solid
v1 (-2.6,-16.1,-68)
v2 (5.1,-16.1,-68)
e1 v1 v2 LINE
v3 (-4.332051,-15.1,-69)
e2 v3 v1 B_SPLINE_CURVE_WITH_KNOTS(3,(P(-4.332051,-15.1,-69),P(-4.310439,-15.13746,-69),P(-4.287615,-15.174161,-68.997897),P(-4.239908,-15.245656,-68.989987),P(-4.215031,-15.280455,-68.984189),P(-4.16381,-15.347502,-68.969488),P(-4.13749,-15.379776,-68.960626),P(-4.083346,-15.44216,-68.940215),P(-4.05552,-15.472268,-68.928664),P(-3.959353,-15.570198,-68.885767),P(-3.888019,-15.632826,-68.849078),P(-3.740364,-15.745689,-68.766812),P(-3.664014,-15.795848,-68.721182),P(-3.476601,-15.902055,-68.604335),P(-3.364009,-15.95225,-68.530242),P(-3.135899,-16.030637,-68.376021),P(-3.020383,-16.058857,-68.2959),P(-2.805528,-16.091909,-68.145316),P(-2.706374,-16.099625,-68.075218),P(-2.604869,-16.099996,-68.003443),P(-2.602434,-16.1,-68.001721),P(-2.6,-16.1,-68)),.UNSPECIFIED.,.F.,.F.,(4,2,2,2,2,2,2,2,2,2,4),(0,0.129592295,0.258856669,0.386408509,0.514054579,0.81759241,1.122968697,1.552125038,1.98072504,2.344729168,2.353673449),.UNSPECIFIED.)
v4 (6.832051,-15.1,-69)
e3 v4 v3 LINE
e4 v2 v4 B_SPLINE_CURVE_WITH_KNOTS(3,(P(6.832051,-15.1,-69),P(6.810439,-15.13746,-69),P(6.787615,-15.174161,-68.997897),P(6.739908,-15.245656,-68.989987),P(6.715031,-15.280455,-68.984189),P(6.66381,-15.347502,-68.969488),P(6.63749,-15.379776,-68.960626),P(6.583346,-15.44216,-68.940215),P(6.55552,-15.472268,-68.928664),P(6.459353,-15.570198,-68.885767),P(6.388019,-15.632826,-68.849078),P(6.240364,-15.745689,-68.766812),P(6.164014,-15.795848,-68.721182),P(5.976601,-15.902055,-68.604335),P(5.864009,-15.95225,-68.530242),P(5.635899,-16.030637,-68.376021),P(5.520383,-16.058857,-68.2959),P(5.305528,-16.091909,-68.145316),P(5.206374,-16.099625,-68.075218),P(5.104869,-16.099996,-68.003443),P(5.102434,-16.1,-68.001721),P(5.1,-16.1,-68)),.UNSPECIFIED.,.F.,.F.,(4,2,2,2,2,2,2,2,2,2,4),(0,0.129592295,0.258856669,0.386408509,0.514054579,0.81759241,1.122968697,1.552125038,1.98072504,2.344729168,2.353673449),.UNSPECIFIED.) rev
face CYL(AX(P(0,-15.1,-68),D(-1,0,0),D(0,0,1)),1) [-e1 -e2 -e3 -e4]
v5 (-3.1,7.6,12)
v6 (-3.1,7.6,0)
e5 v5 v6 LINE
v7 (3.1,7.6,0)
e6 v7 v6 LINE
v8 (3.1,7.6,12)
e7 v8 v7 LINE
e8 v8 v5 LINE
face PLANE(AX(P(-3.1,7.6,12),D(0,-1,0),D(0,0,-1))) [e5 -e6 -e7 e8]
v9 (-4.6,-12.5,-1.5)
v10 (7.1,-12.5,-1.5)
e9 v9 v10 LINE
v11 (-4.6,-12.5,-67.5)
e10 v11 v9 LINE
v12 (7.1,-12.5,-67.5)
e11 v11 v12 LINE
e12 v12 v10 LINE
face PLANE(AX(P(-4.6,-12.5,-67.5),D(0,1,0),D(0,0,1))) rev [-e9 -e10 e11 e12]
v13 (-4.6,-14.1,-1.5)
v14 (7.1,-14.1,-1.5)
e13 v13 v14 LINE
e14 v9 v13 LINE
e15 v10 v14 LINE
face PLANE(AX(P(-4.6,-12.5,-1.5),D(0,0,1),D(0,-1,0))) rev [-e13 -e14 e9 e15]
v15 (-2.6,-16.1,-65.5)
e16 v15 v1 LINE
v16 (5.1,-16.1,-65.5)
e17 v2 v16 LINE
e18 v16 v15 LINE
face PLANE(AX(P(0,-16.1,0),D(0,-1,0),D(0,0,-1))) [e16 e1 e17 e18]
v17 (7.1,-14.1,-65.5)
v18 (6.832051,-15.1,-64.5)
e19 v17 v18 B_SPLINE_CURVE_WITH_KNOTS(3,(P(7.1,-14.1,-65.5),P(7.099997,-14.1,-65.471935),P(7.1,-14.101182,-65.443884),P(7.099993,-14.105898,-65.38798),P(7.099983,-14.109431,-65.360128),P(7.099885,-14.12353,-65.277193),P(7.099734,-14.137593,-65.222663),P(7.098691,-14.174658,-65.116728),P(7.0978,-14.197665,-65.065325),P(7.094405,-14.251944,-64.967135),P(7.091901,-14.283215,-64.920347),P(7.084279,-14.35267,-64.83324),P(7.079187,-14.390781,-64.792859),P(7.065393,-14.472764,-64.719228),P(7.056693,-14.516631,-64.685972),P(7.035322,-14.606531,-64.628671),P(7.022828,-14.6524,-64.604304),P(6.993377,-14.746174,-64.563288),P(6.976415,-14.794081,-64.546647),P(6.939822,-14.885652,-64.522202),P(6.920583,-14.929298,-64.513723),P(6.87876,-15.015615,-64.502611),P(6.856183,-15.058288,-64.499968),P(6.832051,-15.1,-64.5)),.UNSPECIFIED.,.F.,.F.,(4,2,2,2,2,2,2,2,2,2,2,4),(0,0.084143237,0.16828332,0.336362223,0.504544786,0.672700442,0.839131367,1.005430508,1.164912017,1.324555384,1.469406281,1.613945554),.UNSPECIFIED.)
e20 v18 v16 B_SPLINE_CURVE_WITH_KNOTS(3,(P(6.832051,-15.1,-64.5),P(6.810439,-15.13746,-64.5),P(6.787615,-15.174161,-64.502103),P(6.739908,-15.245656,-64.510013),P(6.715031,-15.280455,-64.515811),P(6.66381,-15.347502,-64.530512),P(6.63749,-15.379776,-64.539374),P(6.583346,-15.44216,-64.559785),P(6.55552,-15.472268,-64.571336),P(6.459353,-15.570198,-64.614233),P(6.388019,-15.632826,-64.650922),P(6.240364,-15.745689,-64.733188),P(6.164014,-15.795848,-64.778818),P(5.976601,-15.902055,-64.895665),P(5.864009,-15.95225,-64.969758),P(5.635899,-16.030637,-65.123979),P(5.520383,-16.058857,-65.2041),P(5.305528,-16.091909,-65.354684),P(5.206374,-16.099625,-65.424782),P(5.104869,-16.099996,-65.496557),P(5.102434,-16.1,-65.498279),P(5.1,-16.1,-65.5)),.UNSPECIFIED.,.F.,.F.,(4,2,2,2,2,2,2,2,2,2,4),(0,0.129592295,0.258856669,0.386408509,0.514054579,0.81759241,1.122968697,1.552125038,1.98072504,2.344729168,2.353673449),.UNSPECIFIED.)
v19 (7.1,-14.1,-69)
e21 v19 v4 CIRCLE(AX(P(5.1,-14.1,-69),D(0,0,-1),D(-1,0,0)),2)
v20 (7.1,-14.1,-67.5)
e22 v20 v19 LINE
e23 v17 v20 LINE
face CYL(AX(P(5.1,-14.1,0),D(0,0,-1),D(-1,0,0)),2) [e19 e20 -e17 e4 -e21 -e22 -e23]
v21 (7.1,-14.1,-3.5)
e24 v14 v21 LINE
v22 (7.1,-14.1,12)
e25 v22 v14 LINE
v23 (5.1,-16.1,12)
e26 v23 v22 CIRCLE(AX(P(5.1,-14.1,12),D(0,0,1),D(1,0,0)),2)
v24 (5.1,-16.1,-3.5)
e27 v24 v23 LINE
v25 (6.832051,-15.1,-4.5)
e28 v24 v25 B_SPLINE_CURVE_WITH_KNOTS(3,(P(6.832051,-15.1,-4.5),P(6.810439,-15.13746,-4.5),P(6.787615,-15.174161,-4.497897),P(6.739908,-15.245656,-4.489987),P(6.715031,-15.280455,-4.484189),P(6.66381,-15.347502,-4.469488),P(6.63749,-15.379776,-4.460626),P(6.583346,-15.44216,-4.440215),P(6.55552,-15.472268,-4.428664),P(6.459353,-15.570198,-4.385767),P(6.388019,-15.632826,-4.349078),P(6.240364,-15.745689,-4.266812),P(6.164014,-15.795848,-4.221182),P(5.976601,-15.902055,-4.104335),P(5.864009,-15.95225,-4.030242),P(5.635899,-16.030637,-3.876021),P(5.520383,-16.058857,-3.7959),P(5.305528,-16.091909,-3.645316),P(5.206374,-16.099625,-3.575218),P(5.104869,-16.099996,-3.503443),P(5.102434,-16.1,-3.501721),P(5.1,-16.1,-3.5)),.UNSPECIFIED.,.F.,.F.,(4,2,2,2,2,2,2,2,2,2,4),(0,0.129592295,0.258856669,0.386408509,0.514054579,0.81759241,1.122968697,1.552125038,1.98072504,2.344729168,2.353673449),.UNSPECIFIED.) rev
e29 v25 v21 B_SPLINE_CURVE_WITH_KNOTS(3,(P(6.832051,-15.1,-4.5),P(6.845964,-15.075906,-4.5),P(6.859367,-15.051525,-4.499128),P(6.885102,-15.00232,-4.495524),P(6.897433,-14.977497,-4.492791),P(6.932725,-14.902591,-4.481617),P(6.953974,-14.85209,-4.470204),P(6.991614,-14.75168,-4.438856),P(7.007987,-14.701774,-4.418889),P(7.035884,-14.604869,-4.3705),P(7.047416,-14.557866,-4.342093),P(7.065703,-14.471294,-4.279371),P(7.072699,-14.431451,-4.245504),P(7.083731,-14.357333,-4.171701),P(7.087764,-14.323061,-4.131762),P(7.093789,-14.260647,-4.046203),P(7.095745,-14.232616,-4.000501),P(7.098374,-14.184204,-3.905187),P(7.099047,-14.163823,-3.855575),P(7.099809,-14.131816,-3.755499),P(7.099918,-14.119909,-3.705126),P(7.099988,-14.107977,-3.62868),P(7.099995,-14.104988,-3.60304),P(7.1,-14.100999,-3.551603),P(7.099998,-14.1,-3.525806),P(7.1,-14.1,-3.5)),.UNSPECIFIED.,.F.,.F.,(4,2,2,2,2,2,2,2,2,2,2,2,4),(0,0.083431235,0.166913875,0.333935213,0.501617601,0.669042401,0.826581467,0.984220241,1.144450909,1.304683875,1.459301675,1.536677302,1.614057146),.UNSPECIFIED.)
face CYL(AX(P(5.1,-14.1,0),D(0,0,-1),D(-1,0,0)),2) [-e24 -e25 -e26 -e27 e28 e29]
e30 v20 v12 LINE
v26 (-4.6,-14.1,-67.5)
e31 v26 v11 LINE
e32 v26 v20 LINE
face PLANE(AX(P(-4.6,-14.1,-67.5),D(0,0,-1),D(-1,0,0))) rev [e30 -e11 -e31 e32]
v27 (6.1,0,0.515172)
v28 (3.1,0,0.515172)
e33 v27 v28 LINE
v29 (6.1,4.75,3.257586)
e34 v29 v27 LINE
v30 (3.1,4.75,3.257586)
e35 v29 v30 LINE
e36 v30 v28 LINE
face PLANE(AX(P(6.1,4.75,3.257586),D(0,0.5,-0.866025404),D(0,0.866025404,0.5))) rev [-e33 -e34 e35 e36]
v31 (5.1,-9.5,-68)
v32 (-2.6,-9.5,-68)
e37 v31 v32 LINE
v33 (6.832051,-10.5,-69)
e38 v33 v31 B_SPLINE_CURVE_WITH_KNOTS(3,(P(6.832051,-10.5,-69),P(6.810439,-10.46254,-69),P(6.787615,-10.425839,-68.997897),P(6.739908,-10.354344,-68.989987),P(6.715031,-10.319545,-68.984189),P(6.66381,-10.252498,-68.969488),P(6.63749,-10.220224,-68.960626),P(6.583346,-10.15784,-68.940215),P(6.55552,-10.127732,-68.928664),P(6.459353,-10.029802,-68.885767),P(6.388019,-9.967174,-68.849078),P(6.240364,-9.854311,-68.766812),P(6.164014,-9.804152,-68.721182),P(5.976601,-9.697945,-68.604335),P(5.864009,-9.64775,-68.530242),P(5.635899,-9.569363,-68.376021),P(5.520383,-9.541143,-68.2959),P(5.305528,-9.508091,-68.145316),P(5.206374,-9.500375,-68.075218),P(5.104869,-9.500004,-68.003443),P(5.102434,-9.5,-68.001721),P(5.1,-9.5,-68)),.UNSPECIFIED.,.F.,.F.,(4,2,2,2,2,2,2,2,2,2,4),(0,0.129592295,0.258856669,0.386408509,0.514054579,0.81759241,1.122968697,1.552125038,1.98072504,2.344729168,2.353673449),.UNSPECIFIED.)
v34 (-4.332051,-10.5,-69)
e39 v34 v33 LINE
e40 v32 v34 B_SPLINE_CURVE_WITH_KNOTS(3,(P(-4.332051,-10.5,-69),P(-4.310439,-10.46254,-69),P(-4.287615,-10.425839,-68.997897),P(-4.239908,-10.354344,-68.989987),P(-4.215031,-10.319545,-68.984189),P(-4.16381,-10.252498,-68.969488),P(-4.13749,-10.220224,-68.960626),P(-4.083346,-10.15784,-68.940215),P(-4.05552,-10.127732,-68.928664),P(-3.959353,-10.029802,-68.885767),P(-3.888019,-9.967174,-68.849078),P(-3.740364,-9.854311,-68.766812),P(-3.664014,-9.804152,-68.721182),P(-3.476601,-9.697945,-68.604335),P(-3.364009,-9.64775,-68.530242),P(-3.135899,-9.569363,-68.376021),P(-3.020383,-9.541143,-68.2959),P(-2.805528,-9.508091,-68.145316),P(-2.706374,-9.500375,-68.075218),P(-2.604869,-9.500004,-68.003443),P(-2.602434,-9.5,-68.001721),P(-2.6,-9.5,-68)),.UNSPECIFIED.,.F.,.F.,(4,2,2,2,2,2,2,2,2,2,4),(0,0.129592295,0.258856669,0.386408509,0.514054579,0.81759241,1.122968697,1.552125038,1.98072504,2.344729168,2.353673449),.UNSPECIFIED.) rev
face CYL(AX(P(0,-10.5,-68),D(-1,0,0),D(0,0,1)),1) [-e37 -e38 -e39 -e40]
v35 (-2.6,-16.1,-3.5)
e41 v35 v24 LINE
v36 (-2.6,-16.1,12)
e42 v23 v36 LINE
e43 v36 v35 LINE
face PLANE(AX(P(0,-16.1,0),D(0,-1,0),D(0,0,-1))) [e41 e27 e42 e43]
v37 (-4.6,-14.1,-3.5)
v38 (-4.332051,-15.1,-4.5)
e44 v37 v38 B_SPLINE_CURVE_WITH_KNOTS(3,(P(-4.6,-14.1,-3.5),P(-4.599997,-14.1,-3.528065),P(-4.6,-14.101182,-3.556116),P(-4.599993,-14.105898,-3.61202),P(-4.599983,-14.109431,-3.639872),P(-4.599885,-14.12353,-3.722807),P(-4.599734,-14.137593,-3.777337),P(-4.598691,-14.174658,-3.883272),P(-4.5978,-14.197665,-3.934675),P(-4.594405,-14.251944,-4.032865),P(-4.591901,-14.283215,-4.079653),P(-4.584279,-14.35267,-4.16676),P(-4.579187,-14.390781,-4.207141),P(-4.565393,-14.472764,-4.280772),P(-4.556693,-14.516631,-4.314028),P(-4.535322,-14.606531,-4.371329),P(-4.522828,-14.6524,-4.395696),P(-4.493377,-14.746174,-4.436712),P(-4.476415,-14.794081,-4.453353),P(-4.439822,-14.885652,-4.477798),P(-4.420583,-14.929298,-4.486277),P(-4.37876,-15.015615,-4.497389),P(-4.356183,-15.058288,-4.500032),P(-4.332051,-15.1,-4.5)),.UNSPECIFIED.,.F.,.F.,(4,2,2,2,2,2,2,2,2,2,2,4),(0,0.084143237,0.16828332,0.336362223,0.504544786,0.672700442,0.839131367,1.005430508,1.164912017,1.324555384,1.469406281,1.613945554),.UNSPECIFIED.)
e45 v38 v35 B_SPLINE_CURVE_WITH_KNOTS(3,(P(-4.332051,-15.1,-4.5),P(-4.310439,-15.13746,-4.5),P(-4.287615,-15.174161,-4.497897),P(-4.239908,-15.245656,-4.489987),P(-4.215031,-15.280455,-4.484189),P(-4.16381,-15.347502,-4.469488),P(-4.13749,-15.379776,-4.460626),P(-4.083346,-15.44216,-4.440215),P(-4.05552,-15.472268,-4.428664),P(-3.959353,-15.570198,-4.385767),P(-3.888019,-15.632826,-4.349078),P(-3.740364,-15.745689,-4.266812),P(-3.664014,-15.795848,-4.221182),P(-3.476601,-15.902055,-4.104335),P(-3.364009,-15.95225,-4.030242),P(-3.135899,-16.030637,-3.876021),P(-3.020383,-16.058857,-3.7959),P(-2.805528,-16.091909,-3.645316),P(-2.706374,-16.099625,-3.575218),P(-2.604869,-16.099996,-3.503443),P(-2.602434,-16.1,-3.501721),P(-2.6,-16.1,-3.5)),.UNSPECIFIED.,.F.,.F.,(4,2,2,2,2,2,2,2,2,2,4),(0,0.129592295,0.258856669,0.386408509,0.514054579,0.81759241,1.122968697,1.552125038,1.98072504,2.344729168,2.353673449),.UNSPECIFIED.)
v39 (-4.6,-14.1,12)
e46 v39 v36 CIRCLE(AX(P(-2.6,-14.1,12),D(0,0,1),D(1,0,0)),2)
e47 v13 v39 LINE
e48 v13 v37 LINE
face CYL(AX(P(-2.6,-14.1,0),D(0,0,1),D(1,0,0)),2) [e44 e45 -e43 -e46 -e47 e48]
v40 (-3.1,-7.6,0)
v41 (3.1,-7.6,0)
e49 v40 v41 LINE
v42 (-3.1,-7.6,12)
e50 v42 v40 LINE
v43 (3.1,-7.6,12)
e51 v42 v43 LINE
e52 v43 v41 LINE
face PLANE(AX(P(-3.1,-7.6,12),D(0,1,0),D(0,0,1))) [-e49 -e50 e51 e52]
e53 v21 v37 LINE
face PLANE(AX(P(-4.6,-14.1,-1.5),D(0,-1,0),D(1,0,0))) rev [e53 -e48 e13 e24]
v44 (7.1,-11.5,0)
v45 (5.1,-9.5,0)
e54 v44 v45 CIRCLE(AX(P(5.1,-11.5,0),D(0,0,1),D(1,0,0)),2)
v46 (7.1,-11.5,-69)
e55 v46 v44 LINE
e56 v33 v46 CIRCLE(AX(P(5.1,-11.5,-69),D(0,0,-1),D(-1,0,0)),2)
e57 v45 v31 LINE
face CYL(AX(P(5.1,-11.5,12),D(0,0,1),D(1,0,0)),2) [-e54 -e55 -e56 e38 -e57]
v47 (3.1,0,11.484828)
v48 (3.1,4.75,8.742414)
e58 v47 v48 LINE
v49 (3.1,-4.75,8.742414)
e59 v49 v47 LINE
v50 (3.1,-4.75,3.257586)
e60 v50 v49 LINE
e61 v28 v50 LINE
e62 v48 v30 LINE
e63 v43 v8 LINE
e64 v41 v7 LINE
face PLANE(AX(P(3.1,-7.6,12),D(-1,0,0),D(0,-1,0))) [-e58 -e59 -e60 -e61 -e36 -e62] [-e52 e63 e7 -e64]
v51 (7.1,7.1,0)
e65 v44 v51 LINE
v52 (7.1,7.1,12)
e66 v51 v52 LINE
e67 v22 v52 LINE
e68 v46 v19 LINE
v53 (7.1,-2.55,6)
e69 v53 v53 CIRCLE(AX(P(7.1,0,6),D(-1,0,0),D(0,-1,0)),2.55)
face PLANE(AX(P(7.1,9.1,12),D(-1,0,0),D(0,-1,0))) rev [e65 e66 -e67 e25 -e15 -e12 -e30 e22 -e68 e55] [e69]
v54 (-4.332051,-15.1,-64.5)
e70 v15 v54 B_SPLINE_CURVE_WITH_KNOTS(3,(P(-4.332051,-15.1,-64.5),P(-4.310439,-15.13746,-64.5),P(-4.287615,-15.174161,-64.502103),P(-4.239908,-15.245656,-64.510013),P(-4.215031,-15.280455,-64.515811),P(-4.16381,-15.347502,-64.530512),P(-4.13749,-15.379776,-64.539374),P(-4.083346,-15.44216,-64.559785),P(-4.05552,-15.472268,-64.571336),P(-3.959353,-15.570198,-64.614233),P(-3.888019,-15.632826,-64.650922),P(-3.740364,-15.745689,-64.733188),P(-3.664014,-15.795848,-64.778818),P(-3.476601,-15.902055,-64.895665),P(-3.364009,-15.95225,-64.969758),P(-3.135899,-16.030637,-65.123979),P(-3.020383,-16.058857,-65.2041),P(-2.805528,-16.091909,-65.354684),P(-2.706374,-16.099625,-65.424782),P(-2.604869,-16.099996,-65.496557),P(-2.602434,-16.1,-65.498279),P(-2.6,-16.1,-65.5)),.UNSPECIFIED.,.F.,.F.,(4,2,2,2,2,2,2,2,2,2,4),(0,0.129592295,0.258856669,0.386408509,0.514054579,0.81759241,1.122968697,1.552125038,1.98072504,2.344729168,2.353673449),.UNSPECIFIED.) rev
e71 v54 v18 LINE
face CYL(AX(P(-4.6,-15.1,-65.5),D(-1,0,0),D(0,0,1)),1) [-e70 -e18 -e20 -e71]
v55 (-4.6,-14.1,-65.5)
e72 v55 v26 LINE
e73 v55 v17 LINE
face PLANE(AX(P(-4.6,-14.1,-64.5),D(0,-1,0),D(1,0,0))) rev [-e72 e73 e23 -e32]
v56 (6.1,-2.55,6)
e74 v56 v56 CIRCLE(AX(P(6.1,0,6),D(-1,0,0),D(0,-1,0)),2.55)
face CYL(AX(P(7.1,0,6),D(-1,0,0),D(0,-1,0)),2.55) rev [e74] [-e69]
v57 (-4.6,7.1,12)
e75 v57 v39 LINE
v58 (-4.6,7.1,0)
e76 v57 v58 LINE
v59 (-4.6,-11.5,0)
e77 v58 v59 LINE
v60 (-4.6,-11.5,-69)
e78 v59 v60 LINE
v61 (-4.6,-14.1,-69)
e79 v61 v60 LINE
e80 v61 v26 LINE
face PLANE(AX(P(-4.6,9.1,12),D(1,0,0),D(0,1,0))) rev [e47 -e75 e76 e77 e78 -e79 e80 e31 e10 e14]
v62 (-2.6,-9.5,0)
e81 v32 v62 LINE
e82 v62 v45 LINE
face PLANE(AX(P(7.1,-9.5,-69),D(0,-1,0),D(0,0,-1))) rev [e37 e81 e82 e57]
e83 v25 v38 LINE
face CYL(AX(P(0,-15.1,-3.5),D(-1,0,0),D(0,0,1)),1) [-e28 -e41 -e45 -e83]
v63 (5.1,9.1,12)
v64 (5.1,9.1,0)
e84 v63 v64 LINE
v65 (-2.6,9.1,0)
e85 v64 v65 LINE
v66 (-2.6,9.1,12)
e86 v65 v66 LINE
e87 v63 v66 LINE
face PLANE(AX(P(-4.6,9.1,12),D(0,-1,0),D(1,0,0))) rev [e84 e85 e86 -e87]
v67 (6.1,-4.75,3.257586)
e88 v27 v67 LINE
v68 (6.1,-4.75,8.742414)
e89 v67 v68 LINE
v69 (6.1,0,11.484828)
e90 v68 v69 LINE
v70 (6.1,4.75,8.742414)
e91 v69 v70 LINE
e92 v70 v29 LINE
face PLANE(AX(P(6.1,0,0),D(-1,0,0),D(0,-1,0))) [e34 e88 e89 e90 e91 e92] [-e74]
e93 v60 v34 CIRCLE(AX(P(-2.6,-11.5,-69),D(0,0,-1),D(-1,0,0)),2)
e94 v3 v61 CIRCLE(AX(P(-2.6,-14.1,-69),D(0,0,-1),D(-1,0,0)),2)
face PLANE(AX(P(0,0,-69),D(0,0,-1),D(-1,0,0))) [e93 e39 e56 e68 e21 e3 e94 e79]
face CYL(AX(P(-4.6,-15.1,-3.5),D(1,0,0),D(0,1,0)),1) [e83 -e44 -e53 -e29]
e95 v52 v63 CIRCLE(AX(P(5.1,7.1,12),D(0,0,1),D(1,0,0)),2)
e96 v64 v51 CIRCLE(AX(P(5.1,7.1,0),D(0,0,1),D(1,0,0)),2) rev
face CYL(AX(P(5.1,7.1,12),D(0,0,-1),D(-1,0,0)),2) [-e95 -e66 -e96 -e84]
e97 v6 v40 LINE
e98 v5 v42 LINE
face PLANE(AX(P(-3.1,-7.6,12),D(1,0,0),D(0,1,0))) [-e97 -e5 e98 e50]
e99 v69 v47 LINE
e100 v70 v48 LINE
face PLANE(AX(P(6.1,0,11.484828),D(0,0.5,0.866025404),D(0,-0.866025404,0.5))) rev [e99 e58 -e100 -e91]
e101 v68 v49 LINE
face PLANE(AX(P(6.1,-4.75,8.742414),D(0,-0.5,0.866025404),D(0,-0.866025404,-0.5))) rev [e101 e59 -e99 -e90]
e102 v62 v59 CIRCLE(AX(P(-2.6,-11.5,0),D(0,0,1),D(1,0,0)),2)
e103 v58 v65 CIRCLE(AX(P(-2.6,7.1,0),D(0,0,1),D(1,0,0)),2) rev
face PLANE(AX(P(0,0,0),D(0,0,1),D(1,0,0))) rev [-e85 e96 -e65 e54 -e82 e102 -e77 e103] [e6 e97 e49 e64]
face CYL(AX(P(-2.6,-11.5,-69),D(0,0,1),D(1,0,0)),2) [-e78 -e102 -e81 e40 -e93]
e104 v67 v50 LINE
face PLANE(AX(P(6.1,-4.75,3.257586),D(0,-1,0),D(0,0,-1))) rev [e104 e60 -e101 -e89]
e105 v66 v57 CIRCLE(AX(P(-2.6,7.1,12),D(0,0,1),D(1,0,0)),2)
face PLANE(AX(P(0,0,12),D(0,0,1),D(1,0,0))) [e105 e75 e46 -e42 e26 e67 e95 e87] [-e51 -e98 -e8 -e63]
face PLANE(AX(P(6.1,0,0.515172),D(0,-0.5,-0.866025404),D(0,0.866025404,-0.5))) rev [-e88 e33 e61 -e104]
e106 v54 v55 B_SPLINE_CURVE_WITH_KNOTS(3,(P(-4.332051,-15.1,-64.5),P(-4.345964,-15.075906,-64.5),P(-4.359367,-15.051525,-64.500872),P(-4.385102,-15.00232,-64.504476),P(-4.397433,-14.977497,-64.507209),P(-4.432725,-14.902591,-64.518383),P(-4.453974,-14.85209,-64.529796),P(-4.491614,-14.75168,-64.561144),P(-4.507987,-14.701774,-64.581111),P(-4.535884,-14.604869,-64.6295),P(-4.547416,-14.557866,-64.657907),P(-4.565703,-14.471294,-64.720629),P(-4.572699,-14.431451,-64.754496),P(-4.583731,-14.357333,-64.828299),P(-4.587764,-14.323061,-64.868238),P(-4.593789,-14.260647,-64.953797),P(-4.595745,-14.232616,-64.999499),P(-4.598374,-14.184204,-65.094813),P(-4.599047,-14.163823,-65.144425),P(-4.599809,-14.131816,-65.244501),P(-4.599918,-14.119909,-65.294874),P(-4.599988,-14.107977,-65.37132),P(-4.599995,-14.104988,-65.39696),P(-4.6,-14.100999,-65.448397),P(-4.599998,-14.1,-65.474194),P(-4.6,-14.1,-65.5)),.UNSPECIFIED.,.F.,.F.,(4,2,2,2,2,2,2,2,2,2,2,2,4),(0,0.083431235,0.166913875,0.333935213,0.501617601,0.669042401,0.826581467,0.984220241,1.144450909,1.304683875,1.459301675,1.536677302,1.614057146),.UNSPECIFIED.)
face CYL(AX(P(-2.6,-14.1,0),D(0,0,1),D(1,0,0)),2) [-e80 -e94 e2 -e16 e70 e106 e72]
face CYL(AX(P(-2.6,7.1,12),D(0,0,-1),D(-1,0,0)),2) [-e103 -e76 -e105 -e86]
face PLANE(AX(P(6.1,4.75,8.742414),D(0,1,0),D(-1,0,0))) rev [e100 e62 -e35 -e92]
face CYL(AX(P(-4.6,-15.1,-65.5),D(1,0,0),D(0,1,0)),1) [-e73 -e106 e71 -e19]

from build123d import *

# Parameters (mm, degrees)
SKETCH1_W           = 11.7
SKETCH1_H           = 18.2
SKETCH1_W_2         = 6.2
SKETCH1_H_2         = 15.2
BOSS_EXTRUDE1_DEPTH = 12
SKETCH4_R           = 2.55
CUT_EXTRUDE1_DEPTH  = 3
SKETCH4_3_R         = 2.55
CUT_EXTRUDE2_DEPTH  = 17.914490829
SKETCH9_W           = 11.7
SKETCH9_H           = 12
BOSS_EXTRUDE4_DEPTH = 7
SKETCH7_W           = 11.7
SKETCH7_H           = 6.6
BOSS_EXTRUDE3_DEPTH = 69
CUT_EXTRUDE4_DEPTH  = 72.812951478
FILLET1_R           = 2
FILLET2_R           = 1


# Some blends are built 0.0001 mm under size
with BuildPart() as part:
    # Sketch1 → Boss-Extrude1 (new body)
    with BuildSketch(Plane.XY):
        with Locations((1.25, 0)):
            Rectangle(SKETCH1_W, SKETCH1_H)
        Rectangle(SKETCH1_W_2, SKETCH1_H_2, mode=Mode.SUBTRACT)
    extrude(amount=BOSS_EXTRUDE1_DEPTH)

    # Sketch4 → Cut-Extrude1 (cut)
    with BuildSketch(Plane.ZY.offset(-3.1)):
        Polygon((0.515172443, 0), (3.257586221, -4.75), (8.742413779, -4.75), (11.484827557, 0), (8.742413779, 4.75), (3.257586221, 4.75), align=None)
        with Locations(Location((6, 0, 0), (0, 0, 270))):
            Circle(SKETCH4_R, mode=Mode.SUBTRACT)
    extrude(amount=-CUT_EXTRUDE1_DEPTH, mode=Mode.SUBTRACT)

    # Sketch4<3> → Cut-Extrude2 (cut, through all)
    with BuildSketch(Plane.ZY.offset(-3.1)):
        with Locations(Location((6, 0, 0), (0, 0, 270))):
            Circle(SKETCH4_3_R)
    extrude(amount=-CUT_EXTRUDE2_DEPTH, mode=Mode.SUBTRACT)

    # Sketch9 → Boss-Extrude4 (add)
    with BuildSketch(Plane.XZ.offset(9.1)):
        with Locations((1.25, 6)):
            Rectangle(SKETCH9_W, SKETCH9_H)
    extrude(amount=BOSS_EXTRUDE4_DEPTH)

    # Sketch7 → Boss-Extrude3 (add)
    with BuildSketch(Plane(origin=(0, -2.9, 0), x_dir=(1, 0, 0), z_dir=(0, 0, -1))):
        with Locations((1.25, 9.9)):
            Rectangle(SKETCH7_W, SKETCH7_H)
    extrude(amount=BOSS_EXTRUDE3_DEPTH)

    # Sketch10 → Cut-Extrude4 (cut, through all)
    with BuildSketch(Plane(origin=(7.1, 0, 0), x_dir=(0, 0, -1), z_dir=(1, 0, 0))):
        Polygon((64.5, -16.1), (64.5, -14.1), (67.5, -14.1), (67.5, -12.5), (1.5, -12.5), (1.5, -14.1), (4.5, -14.1), (4.5, -16.1), align=None)
    extrude(amount=-CUT_EXTRUDE4_DEPTH, mode=Mode.SUBTRACT)

    # Fillet1
    fillet1_edges = [part.edges().sort_by_distance(p)[0] for p in [
        (7.1, 9.1, 6),
        (-4.6, 9.1, 6),
        (-4.6, -16.1, 3.75),
        (7.1, -16.1, 3.75),
        (7.1, -9.5, -34.5),
        (-4.6, -9.5, -34.5),
        (-4.6, -16.1, -66.75),
        (7.1, -16.1, -66.75),
    ]]
    fillet(fillet1_edges, radius=FILLET1_R - 0.0001)  # a hair under: the kernel refuses the full size

    # Fillet2
    # the kernel refuses this fillet: 1 mm, written as the material it takes off along each edge
    with BuildSketch(Plane(origin=(9.6, -14.1, -4.5), x_dir=(0, -1, 0), z_dir=(-1, 0, 0)), Plane(origin=(9.6, -14.1, -64.5), x_dir=(0, 0, -1), z_dir=(-1, 0, 0))) as fillet2_piece_1:
        with BuildLine():
            CenterArc((FILLET2_R, FILLET2_R), FILLET2_R, 180, 90)
            Line((0, FILLET2_R), (0, 0))
            Line((0, 0), (FILLET2_R, 0))
        make_face()
    extrude(amount=16.7, mode=Mode.SUBTRACT)
    with BuildSketch(Plane(origin=(7.6001, -16.1, -4.5), x_dir=(0, 0, 1), z_dir=(-1, 0, 0)), Plane(origin=(7.6001, -9.5, -69), x_dir=(0, -1, 0), z_dir=(-1, 0, 0)), Plane(origin=(-5.1001, -16.1, -69), x_dir=(0, 1, 0), z_dir=(1, 0, 0)), Plane(origin=(7.6001, -16.1, -64.5), x_dir=(0, 1, 0), z_dir=(-1, 0, 0))) as fillet2_piece_2:
        with BuildLine():
            CenterArc((FILLET2_R, FILLET2_R), FILLET2_R, 180, 90)
            Line((0, FILLET2_R), (0, 0))
            Line((0, 0), (FILLET2_R, 0))
        make_face()
    extrude(amount=12.7002, mode=Mode.SUBTRACT)


solid = part.part
